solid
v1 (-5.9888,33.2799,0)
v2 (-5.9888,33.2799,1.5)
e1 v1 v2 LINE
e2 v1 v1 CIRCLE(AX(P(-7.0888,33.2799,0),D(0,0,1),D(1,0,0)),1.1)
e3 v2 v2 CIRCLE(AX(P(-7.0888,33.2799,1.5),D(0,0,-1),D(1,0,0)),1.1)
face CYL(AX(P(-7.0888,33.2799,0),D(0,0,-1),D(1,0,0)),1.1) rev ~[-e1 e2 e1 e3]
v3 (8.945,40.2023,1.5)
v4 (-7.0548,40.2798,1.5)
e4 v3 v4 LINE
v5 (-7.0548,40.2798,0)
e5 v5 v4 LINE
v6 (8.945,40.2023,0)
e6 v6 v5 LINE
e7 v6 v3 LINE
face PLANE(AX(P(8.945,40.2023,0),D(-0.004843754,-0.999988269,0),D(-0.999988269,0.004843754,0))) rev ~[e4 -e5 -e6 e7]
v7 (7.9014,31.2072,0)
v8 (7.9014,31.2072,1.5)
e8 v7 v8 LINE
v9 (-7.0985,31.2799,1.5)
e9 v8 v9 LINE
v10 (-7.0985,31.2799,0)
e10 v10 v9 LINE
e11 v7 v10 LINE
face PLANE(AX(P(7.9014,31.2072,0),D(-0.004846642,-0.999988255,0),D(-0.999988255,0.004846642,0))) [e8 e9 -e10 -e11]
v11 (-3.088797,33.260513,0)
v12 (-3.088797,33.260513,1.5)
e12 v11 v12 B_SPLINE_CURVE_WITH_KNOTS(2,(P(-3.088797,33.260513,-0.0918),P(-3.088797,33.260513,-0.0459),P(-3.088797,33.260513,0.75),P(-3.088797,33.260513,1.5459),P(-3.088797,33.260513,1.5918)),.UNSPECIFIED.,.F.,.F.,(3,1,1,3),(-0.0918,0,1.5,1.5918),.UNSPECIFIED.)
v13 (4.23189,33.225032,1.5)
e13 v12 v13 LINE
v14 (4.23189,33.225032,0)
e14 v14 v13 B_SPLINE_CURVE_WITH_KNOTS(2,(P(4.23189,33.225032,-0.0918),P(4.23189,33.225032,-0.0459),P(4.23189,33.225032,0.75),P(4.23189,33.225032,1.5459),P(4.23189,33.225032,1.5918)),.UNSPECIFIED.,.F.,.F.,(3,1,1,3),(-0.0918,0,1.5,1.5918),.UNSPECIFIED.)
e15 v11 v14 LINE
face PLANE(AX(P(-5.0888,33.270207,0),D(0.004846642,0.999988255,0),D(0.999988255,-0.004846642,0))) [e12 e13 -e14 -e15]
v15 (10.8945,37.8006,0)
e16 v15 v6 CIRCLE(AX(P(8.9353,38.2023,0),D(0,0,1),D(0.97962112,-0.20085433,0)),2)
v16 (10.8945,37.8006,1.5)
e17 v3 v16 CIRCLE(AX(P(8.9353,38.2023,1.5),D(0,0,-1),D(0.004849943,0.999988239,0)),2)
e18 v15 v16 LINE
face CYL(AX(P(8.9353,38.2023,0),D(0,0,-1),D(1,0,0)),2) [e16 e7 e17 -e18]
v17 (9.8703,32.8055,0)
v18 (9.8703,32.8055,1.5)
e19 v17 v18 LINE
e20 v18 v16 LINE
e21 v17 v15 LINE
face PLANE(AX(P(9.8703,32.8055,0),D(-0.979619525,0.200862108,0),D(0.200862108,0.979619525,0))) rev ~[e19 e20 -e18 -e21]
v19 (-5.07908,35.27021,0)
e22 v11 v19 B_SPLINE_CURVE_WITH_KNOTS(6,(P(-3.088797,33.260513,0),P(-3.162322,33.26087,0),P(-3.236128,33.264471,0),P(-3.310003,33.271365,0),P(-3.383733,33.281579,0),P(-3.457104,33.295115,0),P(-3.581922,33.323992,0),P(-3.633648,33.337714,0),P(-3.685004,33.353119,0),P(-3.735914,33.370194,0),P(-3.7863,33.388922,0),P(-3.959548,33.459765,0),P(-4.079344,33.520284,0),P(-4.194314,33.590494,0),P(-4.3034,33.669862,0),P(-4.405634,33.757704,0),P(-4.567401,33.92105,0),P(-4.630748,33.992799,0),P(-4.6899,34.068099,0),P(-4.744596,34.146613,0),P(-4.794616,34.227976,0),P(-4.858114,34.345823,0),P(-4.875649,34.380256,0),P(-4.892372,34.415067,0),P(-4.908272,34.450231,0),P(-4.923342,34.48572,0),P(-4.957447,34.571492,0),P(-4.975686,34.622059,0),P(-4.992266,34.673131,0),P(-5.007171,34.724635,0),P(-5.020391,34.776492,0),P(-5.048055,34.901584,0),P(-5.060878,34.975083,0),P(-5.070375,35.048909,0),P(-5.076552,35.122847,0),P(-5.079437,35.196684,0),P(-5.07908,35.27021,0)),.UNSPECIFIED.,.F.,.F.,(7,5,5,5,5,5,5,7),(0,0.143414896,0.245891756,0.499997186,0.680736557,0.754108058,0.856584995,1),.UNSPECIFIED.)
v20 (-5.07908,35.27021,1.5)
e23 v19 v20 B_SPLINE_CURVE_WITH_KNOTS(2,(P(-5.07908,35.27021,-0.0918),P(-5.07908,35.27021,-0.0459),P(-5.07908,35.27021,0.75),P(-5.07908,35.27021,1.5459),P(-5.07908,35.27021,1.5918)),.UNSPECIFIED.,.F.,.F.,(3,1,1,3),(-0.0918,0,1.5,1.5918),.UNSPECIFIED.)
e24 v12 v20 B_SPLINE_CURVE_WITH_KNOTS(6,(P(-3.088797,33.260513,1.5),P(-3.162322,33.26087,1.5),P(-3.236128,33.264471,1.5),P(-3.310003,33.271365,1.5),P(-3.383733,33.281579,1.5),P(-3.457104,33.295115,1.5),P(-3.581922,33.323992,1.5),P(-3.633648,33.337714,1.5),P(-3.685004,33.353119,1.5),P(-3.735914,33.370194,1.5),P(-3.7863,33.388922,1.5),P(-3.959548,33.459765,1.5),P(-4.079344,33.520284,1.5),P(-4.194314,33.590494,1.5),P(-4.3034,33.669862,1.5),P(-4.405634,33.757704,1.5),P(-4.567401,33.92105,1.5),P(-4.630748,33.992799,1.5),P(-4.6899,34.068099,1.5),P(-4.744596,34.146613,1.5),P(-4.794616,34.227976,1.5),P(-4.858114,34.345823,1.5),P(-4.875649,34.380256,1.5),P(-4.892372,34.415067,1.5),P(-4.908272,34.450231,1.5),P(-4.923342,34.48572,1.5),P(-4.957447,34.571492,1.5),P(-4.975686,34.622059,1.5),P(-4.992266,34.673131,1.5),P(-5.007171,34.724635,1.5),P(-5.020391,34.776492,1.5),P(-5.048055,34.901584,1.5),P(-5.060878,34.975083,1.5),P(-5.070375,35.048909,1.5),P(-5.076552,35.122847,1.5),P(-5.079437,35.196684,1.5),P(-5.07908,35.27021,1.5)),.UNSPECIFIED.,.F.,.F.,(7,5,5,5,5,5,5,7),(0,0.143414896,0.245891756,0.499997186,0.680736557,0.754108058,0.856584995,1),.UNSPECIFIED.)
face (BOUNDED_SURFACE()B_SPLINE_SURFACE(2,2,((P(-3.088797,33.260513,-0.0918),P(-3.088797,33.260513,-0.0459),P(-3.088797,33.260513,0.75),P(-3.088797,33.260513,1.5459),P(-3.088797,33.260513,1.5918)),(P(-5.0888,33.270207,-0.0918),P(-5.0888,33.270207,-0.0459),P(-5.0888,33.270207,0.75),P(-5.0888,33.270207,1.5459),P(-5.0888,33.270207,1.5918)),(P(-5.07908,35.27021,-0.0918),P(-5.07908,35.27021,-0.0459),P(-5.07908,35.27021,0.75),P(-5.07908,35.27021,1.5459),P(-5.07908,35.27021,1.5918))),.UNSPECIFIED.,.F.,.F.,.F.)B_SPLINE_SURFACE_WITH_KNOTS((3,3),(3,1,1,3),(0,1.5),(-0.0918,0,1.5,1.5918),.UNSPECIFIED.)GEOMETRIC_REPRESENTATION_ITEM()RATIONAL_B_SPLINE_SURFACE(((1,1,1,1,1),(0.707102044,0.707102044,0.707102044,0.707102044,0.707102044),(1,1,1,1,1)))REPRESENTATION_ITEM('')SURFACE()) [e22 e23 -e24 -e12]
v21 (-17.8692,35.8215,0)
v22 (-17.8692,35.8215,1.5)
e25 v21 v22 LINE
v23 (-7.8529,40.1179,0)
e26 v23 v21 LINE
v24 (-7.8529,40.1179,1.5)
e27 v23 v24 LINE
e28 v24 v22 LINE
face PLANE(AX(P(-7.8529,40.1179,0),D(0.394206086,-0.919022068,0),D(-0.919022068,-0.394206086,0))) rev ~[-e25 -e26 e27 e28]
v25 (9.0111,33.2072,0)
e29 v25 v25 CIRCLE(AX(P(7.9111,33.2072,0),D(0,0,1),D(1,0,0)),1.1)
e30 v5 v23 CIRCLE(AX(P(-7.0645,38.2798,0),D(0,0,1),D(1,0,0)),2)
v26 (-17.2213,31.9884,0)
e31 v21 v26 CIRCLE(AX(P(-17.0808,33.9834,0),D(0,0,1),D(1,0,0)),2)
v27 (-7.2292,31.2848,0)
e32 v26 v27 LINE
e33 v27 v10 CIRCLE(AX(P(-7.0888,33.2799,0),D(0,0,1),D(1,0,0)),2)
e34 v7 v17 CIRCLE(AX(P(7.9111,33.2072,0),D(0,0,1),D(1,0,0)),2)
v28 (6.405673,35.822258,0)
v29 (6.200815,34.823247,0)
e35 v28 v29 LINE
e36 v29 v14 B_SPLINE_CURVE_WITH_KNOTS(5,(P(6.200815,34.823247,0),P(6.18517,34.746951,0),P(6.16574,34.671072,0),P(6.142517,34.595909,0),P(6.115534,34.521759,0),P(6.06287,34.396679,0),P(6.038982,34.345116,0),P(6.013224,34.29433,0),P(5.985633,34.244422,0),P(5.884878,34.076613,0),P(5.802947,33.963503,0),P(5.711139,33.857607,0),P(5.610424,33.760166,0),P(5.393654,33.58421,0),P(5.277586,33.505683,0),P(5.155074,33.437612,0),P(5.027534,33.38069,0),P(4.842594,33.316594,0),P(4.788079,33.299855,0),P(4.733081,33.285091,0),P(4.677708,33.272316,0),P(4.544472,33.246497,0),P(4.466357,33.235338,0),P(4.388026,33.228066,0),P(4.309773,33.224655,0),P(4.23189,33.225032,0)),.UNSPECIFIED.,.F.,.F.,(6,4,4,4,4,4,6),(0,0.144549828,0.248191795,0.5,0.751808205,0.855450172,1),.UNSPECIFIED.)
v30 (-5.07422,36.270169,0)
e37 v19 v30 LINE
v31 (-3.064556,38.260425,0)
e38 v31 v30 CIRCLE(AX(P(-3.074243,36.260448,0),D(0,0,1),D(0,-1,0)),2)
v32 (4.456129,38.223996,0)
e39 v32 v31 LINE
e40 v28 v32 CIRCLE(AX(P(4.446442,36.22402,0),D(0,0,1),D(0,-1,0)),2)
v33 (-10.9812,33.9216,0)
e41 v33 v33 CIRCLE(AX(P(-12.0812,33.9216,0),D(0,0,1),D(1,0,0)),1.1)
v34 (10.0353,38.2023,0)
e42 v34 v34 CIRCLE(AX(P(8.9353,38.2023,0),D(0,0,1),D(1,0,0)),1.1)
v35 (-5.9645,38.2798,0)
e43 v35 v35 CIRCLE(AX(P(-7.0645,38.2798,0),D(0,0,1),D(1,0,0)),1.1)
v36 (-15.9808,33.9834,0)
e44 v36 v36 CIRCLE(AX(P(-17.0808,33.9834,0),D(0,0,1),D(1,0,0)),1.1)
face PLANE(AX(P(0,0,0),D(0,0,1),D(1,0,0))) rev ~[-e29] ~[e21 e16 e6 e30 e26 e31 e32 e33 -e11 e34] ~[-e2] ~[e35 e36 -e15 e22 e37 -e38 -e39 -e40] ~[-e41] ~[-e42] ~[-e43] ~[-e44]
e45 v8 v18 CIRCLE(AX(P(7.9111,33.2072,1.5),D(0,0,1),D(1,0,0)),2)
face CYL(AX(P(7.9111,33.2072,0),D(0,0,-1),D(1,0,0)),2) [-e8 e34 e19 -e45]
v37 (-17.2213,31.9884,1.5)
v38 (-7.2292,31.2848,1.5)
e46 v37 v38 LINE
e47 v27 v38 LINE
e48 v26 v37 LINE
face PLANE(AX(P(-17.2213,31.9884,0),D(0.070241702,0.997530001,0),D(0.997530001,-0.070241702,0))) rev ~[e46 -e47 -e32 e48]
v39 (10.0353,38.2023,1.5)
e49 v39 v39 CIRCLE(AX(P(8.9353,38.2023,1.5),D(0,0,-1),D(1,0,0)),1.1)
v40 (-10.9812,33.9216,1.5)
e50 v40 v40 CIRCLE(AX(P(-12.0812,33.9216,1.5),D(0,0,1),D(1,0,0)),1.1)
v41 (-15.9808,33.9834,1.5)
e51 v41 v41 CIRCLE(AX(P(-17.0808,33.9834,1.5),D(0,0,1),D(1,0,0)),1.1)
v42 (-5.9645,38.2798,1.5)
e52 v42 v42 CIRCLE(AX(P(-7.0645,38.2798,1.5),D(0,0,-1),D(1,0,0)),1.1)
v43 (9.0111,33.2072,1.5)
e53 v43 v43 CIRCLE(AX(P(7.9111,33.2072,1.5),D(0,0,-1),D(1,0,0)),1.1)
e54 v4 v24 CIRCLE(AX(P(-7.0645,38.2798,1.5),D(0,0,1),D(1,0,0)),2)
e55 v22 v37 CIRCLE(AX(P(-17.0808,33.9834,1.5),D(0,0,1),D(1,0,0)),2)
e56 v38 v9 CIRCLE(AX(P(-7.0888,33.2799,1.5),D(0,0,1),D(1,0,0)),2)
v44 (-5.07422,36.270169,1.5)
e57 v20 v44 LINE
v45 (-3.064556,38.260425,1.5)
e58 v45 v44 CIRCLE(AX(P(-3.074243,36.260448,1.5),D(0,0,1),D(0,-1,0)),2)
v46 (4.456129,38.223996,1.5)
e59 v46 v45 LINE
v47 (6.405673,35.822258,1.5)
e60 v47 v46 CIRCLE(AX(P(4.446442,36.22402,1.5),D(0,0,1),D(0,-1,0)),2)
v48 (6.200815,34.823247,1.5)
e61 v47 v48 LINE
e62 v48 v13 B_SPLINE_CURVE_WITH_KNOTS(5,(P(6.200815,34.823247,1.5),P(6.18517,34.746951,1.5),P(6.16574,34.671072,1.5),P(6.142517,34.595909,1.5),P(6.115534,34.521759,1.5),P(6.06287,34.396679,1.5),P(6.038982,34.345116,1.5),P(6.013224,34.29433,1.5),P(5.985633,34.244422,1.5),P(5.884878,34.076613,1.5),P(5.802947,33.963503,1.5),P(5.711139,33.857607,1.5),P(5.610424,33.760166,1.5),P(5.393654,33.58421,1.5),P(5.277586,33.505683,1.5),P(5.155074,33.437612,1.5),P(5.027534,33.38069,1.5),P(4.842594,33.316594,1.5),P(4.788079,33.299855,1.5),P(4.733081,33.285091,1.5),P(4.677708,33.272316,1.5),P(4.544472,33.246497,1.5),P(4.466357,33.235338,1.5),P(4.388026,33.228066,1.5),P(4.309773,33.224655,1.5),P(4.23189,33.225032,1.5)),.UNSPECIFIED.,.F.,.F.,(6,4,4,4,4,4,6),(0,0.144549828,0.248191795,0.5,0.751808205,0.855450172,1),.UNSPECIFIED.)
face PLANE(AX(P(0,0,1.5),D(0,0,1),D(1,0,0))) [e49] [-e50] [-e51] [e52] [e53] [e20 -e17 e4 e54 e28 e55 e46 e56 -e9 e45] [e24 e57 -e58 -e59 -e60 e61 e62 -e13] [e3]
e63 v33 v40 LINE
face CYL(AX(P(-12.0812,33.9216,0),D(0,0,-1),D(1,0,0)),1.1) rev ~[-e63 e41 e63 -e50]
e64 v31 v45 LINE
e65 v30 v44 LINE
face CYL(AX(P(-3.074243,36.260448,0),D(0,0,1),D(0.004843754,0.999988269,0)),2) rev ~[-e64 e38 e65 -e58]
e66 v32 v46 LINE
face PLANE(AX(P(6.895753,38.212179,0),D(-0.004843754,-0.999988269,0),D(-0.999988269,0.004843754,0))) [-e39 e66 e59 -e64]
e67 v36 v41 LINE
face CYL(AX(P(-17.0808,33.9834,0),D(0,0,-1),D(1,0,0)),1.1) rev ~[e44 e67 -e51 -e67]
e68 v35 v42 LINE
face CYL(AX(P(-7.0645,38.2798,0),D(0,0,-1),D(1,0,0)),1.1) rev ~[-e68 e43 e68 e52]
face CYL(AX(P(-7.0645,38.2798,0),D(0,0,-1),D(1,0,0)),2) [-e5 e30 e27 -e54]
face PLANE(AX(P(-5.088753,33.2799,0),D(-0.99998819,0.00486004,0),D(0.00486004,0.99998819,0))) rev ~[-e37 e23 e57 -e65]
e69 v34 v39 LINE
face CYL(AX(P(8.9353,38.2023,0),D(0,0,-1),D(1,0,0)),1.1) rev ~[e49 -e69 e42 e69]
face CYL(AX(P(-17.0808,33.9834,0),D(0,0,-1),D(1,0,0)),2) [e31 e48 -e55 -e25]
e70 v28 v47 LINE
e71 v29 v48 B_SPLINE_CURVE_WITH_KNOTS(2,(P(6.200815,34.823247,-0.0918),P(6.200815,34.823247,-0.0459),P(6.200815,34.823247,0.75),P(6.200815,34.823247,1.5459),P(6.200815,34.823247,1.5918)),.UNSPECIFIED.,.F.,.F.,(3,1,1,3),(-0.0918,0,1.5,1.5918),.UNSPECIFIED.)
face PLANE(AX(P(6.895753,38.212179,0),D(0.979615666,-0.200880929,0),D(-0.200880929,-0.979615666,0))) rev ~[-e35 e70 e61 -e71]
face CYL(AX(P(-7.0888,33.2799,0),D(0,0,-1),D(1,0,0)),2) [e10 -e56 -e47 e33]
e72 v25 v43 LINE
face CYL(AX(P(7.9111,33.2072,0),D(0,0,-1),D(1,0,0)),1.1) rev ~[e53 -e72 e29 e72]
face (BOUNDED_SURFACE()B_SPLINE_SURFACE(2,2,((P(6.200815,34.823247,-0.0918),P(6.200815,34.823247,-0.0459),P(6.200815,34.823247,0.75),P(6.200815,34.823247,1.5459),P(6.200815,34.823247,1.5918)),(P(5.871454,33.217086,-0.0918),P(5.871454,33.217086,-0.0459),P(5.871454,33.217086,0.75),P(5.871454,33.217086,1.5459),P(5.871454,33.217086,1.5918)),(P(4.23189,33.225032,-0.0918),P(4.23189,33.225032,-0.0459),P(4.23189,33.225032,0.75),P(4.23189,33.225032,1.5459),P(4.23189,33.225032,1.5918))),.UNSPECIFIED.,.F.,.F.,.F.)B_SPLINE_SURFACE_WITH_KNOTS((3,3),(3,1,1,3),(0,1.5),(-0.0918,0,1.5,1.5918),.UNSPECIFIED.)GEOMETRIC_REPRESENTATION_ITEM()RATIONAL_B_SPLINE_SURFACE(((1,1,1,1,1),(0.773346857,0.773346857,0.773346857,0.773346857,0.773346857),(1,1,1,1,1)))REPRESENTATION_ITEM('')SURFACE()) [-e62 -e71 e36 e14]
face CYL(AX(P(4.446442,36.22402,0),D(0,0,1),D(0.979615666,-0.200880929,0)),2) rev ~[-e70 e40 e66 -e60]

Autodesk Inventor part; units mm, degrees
ref_plane "YZ Plane" through (0, 0, 0) normal (1, 0, 0) x (0, 1, 0)
ref_plane "XZ Plane" through (0, 0, 0) normal (0, 1, 0) x (-1, 0, 0)
ref_plane "XY Plane" through (0, 0, 0) normal (0, 0, 1) x (1, 0, 0)
sketch "スケッチ1" plane through (0, 0, 0) normal (0, 0, 1) x (1, 0, 0)
  circle A0 centre (7.9111, 33.2072) radius 1.1
  circle A1 centre (8.9353, 38.2023) radius 1.1
  circle A2 centre (-7.0645, 38.2798) radius 1.1
  circle A3 centre (-7.0888, 33.2799) radius 1.1
  spline S0 degree 3 poles (-12.8646, 33.9313) (-12.8659, 33.8333) (-12.8476, 33.7285) (-12.7708, 33.5355) (-12.7123, 33.4473) (-12.5725, 33.3024) (-12.4805, 33.2392) (-12.2855, 33.1578) (-12.1826, 33.1393) (-11.9746, 33.1367) (-11.8589, 33.1621) (-11.6558, 33.2543) (-11.5682, 33.3207) (-11.4449, 33.4571) (-11.3945, 33.5329) (-11.3402, 33.6628) (-11.3255, 33.7089) (-11.3046, 33.8062) (-11.2984, 33.8576) (-11.2971, 33.9662) (-11.302, 34.0177) (-11.3205, 34.1156) (-11.334, 34.1619) (-11.3851, 34.2932) (-11.4336, 34.3702) (-11.5535, 34.5096) (-11.6394, 34.5782) (-11.8401, 34.6754) (-11.9552, 34.7036) (-12.1632, 34.7062) (-12.2665, 34.6902) (-12.4635, 34.6136) (-12.557, 34.5528) (-12.7004, 34.4113) (-12.7611, 34.3246) (-12.8426, 34.1336) (-12.8634, 34.0293) (-12.8646, 33.9313) knots 0 0 0 0 0.029408 0.029408 0.058816 0.058816 0.090592 0.090592 0.122368 0.122368 0.162647 0.162647 0.202927 0.202927 0.235498 0.235498 0.251784 0.251784 0.26807 0.26807 0.284355 0.284355 0.300641 0.300641 0.333213 0.333213 0.373492 0.373492 0.413772 0.413772 0.445548 0.445548 0.477323 0.477323 0.506731 0.506731 0.536139 0.536139 0.536139 0.536139
  circle A4 centre (-17.0808, 33.9834) radius 0.7835
  arc A5 (-11.6308, 33.2805) -> (-11.6151, 34.5514) centre (-12.0812, 33.9216) ccw construction
  circle A6 centre (-12.0812, 33.9216) radius 1.1
  circle A7 centre (-17.0808, 33.9834) radius 1.1
  circle A8 centre (8.9353, 38.2023) radius 2
  circle A9 centre (-7.0645, 38.2798) radius 2
  circle A10 centre (-7.0888, 33.2799) radius 2
  circle A11 centre (7.9111, 33.2072) radius 2
  circle A12 centre (-12.0812, 33.9216) radius 2
  circle A13 centre (-17.0808, 33.9834) radius 2
  line L0 (8.945, 40.2023) -> (-7.0548, 40.2798)
  line L1 (9.8703, 32.8055) -> (10.8945, 37.8006)
  line L2 (7.9014, 31.2072) -> (-7.0985, 31.2799)
  line L3 (-7.8529, 40.1179) -> (-17.8692, 35.8215)
  line L4 (-17.2213, 31.9884) -> (-7.2292, 31.2848)
  line L5 (6.9761, 38.604) -> (5.9518, 33.6089)
  line L6 (8.9353, 38.2023) -> (-7.0645, 38.2798)
  line L7 (-5.0888, 33.2702) -> (-5.0645, 38.2701)
  line L8 (-7.0888, 33.2799) -> (7.9111, 33.2072)
  point P0 (0, 0)
  point P1 (-12.8646, 33.9313)
  point P2 (6.9353, 38.212)
  point P3 (6.8957, 38.2122)
  point P4 (5.9111, 33.2169)
extrude "押し出し1" add sketch "スケッチ1" along normal blind 1.5 contours A8 | A8 L5 L6 A9 L0 | L1 A11 L5 L6 A8 | A8 L6 L5 | A9 | A11 | A9 L7 A10 L4 A13 L3 | L2 A10 L8 A11 | A13 | A10 | A12
fillet "フィレット1" radius 2 4 edges at (6.8957, 38.2122, 0.75) (5.9111, 33.2169, 0.75) (-5.0645, 38.2701, 0.75) (-5.0888, 33.2702, 0.75)
properties part number "ude_tunagi" material "アルミニウム 2014-T4"
